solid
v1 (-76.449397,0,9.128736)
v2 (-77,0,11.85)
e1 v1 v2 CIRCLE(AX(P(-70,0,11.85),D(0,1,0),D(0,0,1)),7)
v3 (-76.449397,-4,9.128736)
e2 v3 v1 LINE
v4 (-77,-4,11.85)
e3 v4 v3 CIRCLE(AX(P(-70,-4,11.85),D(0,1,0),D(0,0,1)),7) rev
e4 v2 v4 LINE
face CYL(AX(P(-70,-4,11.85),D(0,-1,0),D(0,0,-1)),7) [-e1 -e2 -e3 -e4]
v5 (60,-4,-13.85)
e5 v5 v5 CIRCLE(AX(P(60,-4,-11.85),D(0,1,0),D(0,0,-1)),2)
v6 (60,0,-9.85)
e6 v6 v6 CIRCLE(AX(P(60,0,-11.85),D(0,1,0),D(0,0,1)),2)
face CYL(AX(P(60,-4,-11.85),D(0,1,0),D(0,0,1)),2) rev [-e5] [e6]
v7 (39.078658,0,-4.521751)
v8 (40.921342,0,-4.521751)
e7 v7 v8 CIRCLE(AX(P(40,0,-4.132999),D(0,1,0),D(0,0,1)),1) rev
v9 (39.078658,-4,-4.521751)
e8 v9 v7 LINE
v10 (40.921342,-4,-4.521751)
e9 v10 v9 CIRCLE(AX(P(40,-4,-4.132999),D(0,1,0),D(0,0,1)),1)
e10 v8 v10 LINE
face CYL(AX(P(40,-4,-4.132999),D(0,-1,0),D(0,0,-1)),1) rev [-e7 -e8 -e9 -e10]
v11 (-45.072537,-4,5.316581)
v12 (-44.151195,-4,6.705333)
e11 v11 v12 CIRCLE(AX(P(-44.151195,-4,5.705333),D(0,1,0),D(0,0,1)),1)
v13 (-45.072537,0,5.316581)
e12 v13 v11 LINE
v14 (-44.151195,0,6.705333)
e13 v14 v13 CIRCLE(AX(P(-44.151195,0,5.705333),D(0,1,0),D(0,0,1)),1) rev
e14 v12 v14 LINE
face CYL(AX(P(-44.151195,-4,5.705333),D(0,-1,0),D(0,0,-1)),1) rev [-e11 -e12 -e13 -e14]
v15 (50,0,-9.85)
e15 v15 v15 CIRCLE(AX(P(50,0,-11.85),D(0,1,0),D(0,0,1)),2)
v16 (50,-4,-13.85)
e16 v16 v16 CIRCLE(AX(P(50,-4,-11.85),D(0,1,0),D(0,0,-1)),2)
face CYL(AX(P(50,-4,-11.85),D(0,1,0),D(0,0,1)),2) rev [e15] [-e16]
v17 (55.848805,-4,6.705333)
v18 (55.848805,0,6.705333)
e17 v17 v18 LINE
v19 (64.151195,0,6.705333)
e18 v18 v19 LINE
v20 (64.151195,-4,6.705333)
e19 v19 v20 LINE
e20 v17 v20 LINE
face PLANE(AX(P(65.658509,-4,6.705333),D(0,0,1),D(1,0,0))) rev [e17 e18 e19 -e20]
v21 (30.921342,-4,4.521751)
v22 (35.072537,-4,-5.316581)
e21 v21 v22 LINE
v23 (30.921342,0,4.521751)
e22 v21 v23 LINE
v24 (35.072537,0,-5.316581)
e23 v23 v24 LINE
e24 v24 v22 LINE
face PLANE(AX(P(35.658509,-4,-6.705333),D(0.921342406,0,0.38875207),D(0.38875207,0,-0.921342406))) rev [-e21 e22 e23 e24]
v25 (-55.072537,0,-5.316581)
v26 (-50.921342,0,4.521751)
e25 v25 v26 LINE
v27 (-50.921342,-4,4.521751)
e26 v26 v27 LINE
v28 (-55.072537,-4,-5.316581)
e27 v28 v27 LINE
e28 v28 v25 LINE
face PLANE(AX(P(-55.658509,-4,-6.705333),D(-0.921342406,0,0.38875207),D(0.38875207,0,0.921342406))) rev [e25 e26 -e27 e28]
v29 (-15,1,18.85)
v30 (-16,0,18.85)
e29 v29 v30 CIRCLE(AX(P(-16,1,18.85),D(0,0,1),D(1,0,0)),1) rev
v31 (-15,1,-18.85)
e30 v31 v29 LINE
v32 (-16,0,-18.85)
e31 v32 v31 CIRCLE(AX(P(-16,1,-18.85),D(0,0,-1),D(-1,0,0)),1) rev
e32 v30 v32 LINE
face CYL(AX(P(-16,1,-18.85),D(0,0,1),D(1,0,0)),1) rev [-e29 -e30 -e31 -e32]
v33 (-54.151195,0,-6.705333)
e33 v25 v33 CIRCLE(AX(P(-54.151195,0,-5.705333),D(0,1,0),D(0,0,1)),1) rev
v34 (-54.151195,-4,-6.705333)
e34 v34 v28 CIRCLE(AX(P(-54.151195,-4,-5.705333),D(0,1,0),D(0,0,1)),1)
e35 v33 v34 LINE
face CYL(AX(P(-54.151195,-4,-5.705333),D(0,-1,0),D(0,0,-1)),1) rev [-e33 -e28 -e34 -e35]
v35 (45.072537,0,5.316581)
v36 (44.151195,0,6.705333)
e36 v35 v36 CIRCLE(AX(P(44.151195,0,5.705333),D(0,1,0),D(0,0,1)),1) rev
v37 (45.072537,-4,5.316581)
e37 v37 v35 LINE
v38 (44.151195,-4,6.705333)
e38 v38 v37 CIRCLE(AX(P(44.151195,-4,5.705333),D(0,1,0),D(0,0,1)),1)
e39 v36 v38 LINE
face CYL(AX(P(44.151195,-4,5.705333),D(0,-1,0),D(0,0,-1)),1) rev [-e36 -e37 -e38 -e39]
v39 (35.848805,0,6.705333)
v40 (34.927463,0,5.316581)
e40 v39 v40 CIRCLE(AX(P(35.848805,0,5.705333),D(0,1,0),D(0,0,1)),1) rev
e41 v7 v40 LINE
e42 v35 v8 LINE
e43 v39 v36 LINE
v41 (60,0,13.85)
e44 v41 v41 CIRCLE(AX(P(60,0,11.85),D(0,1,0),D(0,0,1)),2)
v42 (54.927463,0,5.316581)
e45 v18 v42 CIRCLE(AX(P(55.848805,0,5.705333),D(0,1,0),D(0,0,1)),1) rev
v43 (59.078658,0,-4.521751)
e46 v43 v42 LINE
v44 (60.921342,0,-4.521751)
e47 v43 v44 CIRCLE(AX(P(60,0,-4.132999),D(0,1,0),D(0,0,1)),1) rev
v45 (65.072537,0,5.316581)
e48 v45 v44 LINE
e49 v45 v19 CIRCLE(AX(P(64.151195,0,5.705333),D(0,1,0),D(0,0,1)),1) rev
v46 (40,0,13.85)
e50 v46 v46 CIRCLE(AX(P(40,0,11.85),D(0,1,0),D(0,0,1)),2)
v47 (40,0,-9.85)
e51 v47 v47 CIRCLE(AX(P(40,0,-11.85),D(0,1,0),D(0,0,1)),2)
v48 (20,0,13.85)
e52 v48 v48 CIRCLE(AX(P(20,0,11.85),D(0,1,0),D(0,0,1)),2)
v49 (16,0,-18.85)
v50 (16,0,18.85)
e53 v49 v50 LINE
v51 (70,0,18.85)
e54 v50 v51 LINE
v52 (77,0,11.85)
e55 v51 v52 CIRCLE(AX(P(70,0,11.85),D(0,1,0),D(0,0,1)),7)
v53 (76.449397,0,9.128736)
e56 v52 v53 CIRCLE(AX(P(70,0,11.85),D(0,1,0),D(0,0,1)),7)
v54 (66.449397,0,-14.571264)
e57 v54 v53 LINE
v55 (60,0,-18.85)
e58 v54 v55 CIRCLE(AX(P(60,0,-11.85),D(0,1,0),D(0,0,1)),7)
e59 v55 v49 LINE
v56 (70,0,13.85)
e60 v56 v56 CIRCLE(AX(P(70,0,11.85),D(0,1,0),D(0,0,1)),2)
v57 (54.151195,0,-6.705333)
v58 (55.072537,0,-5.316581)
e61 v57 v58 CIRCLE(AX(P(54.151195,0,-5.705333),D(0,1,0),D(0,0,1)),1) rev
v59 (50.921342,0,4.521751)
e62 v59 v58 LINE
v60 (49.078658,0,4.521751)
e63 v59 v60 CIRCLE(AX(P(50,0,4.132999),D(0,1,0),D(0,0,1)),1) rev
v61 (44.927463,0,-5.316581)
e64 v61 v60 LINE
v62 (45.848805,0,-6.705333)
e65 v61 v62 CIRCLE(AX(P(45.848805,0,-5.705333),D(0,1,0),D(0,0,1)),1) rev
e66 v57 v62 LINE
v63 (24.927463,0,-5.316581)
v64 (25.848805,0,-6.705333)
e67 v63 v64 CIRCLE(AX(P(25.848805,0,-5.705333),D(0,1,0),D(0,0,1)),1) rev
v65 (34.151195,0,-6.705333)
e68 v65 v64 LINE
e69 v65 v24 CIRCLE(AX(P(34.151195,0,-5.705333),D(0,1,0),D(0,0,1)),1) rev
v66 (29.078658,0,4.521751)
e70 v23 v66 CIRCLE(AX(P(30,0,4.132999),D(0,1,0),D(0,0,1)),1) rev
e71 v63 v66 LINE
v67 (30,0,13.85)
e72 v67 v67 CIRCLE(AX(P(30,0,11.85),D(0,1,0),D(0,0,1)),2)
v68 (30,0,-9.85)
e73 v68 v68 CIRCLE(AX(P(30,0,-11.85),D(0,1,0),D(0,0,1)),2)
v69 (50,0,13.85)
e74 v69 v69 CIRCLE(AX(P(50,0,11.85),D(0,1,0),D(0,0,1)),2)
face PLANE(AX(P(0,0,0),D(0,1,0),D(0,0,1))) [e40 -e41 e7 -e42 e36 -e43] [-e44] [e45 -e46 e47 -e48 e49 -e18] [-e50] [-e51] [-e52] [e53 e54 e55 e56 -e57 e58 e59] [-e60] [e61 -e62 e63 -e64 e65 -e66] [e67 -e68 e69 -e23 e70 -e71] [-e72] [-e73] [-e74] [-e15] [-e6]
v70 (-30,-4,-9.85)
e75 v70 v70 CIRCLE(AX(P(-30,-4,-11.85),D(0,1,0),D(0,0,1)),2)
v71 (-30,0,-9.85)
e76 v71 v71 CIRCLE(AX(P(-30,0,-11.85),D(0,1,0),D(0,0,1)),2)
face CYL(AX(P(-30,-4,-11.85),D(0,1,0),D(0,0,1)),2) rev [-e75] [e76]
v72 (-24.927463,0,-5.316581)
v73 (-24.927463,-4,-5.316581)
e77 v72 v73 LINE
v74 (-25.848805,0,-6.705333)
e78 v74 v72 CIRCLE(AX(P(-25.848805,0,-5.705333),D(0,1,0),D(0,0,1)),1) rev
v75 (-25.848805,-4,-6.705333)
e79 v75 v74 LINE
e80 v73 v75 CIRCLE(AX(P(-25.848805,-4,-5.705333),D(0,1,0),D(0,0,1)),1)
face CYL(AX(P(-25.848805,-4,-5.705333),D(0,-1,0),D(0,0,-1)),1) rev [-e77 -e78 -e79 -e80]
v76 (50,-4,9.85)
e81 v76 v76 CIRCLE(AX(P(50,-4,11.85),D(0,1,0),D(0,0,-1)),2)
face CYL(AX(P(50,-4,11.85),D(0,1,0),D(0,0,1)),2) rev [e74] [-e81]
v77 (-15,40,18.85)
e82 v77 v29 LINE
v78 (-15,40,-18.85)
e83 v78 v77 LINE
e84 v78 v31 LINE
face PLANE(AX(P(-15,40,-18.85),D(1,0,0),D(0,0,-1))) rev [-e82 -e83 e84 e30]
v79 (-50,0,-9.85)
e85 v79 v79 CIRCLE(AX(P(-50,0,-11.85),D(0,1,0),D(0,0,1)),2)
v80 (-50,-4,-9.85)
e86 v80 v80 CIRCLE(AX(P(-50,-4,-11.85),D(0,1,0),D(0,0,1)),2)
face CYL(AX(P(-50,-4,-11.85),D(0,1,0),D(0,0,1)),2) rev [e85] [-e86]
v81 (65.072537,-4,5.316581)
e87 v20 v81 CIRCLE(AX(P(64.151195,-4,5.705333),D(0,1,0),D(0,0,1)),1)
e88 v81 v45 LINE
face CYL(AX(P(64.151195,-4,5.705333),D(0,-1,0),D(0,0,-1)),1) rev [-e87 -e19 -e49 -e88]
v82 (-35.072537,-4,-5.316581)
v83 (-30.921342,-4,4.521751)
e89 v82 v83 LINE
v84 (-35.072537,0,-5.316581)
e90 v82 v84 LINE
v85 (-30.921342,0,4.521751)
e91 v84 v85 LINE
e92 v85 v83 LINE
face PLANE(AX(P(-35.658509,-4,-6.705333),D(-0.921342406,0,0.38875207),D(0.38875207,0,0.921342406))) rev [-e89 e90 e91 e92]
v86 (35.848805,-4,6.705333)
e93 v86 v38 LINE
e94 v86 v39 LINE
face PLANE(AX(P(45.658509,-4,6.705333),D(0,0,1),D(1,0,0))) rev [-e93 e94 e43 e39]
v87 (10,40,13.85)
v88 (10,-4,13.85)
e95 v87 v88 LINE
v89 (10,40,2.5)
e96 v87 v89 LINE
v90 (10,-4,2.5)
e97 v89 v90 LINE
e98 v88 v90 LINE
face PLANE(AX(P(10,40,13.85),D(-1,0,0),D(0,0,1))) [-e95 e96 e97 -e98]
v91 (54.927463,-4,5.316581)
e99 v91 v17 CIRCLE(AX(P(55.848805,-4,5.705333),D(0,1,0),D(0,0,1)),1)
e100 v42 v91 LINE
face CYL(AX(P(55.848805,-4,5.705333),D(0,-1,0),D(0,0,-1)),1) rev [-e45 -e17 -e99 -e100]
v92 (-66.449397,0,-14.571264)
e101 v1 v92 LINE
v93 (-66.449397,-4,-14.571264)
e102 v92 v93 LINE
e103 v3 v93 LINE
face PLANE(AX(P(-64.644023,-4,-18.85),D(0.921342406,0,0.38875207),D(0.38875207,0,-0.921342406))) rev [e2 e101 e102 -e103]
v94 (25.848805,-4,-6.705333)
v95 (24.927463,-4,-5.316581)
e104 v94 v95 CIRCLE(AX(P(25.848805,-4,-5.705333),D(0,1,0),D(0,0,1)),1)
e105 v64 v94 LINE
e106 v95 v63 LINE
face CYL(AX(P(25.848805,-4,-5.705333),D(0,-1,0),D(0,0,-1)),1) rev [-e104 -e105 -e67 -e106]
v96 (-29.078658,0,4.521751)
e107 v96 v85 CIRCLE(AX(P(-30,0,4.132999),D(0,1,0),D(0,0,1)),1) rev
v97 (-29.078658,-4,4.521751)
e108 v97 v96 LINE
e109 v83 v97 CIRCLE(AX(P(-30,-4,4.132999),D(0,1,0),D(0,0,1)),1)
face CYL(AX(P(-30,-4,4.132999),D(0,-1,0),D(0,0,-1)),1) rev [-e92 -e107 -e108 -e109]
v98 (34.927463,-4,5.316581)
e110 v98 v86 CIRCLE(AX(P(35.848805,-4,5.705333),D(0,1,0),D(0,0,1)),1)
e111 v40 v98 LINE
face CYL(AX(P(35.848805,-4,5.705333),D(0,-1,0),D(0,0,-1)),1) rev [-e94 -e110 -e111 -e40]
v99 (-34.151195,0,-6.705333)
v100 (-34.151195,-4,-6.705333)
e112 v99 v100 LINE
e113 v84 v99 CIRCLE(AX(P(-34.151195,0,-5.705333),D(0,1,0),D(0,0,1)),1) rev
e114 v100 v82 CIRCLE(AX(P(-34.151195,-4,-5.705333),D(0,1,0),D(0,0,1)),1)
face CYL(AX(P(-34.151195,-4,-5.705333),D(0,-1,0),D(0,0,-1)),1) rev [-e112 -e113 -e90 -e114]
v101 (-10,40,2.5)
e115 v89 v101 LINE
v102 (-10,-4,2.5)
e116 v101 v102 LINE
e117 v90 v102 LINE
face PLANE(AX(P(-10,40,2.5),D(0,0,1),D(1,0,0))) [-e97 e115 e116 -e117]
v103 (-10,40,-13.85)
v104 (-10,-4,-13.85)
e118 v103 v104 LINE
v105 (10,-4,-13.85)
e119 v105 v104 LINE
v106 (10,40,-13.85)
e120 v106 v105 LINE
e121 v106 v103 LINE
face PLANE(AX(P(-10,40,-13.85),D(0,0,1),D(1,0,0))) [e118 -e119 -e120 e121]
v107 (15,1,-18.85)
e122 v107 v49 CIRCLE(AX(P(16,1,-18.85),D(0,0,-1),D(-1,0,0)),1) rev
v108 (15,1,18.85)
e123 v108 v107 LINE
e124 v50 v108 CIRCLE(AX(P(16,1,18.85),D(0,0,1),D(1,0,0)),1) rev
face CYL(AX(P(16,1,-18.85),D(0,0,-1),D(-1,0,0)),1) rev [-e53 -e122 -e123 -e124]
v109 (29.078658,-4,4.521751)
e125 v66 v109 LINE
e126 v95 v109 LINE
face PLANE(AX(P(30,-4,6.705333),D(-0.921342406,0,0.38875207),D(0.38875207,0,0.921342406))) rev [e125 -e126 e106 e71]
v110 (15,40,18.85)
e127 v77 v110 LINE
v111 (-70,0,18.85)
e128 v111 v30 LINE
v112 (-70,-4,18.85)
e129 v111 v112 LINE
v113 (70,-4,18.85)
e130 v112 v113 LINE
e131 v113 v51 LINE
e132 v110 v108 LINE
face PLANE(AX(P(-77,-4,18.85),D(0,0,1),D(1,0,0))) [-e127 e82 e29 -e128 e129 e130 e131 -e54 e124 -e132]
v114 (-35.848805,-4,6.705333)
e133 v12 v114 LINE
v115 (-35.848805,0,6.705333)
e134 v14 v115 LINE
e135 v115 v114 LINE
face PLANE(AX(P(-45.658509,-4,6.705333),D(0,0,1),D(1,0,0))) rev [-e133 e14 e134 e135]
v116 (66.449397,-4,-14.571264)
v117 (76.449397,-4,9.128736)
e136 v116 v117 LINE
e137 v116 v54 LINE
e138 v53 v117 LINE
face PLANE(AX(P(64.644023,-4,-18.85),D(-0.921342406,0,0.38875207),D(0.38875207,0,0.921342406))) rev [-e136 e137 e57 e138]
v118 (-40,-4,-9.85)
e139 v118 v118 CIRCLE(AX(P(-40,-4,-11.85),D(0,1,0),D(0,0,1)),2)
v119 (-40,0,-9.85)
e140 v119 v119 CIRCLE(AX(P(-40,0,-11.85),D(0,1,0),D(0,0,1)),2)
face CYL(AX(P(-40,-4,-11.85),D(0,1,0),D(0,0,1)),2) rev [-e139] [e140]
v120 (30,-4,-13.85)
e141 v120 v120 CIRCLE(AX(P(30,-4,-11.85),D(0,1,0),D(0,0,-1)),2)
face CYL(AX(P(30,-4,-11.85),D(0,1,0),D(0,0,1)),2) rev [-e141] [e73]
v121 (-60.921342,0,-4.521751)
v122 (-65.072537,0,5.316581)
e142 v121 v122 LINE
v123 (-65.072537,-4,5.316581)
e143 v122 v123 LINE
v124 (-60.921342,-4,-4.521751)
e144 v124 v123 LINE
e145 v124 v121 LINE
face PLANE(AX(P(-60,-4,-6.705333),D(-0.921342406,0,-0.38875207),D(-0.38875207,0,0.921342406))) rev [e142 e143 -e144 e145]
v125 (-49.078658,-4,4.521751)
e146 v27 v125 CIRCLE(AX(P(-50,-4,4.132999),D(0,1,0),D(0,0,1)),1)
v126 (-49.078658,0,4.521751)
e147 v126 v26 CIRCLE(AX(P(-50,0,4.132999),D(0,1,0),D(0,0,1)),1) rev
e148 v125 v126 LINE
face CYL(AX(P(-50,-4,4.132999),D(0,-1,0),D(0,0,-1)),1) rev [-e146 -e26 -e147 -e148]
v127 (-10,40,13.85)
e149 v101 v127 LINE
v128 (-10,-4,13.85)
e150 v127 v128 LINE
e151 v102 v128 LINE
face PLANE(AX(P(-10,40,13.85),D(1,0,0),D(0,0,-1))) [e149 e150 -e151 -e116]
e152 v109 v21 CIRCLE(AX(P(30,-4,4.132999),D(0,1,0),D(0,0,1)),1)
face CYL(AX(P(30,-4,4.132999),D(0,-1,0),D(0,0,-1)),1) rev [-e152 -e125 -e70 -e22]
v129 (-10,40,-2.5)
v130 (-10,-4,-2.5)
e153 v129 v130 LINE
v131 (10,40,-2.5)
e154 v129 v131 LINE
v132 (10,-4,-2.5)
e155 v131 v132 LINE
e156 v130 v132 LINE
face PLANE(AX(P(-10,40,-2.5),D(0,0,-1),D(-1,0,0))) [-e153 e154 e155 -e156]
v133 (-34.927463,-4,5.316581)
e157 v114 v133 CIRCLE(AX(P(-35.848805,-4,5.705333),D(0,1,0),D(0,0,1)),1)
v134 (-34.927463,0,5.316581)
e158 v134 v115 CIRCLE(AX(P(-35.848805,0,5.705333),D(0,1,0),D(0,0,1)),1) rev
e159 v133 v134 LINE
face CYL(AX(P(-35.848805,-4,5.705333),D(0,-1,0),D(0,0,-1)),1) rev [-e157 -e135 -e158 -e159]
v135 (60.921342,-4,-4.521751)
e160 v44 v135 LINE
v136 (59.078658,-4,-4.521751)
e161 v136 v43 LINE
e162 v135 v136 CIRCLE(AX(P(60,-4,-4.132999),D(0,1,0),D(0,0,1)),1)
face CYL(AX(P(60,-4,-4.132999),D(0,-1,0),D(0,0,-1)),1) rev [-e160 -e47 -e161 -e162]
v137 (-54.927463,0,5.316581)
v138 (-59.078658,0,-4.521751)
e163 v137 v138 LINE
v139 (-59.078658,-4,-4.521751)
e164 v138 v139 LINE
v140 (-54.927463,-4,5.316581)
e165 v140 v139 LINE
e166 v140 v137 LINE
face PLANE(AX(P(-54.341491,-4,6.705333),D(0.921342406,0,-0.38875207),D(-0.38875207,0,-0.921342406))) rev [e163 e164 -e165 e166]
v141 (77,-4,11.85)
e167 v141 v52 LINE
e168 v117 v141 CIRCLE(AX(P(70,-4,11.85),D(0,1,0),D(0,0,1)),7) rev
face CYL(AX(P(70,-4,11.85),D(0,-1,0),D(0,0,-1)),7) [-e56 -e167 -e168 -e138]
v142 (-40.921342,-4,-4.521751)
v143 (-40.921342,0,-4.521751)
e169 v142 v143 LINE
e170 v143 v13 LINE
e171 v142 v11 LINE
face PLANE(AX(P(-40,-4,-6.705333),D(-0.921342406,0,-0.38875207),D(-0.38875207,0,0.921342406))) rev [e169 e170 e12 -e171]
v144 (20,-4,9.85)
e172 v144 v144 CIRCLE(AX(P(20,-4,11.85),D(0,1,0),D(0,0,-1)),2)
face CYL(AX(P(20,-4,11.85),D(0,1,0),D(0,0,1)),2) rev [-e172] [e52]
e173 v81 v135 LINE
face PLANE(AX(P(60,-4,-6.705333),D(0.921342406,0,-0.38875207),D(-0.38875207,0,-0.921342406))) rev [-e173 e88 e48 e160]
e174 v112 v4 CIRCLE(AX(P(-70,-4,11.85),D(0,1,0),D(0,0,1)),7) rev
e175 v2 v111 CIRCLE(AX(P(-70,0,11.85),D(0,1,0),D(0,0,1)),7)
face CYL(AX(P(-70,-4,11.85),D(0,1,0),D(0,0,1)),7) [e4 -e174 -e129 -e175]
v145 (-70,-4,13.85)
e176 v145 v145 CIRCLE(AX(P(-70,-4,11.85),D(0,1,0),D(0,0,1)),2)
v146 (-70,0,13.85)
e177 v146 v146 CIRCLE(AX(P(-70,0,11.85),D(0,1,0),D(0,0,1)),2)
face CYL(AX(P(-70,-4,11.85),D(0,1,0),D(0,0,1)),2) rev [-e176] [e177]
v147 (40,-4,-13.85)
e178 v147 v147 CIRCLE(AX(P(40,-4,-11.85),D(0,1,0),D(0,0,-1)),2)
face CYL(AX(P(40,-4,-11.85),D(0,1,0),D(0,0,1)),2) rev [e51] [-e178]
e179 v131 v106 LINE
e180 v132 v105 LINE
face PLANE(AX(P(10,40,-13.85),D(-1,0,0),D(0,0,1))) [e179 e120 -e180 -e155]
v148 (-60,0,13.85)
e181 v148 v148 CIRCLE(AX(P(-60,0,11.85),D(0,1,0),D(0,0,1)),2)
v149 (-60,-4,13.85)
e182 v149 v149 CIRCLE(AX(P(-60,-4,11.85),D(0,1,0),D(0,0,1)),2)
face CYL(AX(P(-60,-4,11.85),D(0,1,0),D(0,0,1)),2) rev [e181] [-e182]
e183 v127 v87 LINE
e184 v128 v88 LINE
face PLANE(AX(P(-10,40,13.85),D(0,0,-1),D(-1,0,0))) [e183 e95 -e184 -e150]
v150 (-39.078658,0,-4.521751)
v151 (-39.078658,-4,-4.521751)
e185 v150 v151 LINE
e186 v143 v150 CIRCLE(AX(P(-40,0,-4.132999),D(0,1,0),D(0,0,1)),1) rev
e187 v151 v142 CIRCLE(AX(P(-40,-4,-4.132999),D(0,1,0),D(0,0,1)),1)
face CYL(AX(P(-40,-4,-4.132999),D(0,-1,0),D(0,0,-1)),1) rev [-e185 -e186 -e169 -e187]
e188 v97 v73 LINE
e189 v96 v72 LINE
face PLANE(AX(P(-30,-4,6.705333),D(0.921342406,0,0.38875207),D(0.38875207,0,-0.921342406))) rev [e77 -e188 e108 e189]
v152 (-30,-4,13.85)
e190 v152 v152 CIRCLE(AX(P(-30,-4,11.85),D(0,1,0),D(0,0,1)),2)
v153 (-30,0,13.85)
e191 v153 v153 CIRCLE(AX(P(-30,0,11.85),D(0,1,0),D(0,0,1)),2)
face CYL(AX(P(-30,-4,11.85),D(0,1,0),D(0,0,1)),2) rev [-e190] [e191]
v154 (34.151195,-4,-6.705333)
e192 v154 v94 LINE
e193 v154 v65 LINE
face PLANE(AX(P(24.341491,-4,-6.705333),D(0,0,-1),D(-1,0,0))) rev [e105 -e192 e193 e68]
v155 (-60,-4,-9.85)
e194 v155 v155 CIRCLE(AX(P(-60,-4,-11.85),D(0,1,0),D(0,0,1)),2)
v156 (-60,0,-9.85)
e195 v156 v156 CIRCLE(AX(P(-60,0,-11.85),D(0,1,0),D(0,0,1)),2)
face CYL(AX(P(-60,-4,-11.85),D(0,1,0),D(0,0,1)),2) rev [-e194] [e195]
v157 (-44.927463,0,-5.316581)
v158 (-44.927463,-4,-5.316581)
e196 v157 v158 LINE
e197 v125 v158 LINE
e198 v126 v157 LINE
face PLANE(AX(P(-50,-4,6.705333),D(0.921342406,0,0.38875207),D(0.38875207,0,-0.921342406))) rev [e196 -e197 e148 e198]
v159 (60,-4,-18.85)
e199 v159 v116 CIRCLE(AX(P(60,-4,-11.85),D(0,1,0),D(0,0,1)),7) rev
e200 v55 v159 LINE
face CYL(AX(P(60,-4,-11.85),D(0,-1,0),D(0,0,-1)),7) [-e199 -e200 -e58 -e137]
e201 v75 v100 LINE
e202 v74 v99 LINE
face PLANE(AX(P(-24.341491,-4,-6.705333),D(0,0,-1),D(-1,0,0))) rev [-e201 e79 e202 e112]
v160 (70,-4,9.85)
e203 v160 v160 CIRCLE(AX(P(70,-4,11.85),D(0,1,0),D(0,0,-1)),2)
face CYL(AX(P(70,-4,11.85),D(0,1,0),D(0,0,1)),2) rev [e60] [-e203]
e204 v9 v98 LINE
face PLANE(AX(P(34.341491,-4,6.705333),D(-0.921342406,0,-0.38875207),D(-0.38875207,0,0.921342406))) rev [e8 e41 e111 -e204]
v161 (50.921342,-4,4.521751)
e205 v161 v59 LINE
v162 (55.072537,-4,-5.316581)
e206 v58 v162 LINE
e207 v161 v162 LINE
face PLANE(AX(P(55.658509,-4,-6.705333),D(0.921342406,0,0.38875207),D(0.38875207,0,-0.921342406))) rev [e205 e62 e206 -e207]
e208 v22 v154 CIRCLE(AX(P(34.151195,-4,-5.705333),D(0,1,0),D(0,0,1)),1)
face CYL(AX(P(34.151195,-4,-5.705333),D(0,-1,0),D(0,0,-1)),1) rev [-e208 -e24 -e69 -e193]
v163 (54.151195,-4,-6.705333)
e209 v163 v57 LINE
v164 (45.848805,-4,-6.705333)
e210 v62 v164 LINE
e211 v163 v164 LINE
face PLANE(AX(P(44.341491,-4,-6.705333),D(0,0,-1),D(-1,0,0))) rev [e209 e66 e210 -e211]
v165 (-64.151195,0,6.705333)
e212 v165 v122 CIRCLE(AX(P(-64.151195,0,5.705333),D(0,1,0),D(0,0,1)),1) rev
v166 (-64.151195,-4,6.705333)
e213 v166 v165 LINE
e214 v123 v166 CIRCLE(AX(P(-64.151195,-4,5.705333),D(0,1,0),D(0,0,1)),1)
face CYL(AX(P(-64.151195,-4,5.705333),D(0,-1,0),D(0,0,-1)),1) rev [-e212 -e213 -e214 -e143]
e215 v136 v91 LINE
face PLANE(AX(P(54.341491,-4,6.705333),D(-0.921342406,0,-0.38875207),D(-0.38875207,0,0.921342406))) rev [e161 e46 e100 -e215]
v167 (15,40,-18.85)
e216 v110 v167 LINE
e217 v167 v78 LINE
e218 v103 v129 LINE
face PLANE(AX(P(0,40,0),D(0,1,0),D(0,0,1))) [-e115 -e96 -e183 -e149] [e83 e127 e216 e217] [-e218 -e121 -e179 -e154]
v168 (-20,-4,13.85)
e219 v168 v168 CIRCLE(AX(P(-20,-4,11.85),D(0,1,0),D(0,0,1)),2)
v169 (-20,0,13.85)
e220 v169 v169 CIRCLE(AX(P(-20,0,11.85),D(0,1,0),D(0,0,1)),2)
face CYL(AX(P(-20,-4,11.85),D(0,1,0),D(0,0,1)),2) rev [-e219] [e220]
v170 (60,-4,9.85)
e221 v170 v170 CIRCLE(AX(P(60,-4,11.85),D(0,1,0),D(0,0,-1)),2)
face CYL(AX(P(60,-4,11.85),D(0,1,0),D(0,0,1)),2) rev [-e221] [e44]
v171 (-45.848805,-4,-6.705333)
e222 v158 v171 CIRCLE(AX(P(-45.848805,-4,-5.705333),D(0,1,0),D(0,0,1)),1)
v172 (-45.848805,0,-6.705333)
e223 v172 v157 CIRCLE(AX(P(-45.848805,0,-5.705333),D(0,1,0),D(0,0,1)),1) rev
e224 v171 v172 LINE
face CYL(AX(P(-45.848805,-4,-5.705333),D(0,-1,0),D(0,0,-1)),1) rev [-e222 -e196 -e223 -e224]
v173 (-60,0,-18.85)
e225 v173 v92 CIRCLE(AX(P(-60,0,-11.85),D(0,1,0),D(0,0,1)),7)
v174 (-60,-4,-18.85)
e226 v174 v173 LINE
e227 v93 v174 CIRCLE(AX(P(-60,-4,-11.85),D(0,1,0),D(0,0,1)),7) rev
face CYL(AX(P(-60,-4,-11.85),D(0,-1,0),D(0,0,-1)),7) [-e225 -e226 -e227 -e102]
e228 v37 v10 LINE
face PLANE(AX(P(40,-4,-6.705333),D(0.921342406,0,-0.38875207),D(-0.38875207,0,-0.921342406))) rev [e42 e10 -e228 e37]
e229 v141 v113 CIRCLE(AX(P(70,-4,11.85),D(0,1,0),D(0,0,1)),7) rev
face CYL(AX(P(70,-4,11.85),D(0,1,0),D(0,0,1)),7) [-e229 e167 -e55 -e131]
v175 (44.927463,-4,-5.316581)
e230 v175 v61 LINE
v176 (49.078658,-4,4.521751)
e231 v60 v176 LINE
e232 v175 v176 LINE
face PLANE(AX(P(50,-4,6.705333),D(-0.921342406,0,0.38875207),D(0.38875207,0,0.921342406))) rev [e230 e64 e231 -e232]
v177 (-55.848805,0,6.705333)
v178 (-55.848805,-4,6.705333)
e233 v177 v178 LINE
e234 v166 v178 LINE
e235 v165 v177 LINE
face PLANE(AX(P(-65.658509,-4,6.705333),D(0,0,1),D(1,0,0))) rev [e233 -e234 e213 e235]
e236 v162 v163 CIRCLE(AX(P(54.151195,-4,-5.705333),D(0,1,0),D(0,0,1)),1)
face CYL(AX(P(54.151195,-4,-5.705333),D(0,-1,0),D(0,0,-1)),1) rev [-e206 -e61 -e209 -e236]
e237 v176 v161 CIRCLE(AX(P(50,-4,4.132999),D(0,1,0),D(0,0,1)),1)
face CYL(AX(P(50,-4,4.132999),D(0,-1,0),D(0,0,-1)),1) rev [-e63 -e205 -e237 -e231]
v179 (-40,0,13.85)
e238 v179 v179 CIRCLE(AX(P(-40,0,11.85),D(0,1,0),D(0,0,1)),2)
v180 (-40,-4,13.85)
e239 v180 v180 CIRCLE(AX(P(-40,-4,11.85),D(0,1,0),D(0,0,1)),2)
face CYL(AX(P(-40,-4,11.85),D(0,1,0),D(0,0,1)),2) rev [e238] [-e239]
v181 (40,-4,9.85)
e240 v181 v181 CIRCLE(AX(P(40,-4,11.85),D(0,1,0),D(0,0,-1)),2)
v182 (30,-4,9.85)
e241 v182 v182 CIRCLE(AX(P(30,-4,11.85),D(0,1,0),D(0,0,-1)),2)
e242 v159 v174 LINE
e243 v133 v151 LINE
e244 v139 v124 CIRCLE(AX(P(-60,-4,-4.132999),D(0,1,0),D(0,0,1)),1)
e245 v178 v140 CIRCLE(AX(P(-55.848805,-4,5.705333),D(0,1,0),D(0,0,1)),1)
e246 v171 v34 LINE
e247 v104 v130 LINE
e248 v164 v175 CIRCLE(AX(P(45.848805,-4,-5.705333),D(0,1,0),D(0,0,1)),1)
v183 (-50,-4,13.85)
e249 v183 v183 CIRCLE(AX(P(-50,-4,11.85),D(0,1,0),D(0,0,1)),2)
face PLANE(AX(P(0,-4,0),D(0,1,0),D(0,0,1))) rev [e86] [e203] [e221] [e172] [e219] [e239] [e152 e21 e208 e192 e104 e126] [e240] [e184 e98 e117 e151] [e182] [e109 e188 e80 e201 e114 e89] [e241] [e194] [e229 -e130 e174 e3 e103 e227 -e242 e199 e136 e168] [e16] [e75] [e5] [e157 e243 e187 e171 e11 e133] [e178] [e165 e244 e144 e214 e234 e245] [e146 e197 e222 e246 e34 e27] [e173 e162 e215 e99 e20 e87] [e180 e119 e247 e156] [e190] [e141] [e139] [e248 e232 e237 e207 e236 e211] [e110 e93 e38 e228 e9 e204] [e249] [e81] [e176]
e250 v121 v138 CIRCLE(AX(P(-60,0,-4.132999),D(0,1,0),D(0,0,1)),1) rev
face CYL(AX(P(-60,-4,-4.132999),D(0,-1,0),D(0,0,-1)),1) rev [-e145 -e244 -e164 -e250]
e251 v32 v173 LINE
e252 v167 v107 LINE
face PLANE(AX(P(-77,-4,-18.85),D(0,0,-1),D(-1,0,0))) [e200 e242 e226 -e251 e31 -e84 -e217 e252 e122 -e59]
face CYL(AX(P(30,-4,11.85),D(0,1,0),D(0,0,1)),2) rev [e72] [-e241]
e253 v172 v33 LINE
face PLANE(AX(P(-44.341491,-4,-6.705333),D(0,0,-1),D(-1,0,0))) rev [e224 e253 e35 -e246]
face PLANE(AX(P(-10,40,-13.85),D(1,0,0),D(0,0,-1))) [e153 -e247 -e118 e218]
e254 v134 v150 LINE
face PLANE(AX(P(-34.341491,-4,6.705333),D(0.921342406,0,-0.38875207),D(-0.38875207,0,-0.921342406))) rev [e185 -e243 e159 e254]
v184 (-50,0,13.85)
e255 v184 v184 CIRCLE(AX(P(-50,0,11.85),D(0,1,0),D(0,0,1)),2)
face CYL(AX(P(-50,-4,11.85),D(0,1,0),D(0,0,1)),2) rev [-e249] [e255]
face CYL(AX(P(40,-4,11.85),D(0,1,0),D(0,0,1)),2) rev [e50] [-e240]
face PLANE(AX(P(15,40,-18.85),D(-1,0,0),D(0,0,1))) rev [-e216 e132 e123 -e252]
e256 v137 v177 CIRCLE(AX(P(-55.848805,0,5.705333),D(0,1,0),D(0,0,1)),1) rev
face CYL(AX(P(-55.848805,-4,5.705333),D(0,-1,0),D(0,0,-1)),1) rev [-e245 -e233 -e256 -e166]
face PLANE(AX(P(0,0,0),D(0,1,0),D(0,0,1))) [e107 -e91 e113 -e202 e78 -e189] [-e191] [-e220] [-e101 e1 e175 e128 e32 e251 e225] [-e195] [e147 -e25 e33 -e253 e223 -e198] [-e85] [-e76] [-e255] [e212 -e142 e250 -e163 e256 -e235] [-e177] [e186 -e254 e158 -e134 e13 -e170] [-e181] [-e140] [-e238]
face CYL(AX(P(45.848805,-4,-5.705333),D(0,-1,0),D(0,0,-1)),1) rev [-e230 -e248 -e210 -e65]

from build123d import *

# Parameters (mm, degrees)
SKETCH_1_W               = 154
SKETCH_1_H               = 37.7
EXTRUDE_1_DEPTH          = 4
CUT_EXTRUDE_1_DEPTH      = 80.374570865
CUT_EXTRUDE_1_DEPTH_BACK = 80.374570865
SKETCH_2_R               = 2
CUT_EXTRUDE_2_DEPTH      = 80.374570865
CUT_EXTRUDE_2_DEPTH_BACK = 80.374570865
FILLET_1_R               = 7
SKETCH_4_W               = 30
SKETCH_4_H               = 37.7
EXTRUDE_2_DEPTH          = 40
CUT_EXTRUDE_3_DEPTH      = 89.793707547
CUT_EXTRUDE_3_DEPTH_BACK = 89.793707547
SKETCH_5_W               = 20
SKETCH_5_H               = 11.35
CUT_EXTRUDE_4_DEPTH      = 89.793707547
CUT_EXTRUDE_4_DEPTH_BACK = 89.793707547
FILLET_2_R               = 1
FILLET_4_R               = 1


with BuildPart() as part:
    # 草图1 → 凸台-拉伸1 (new body)
    with BuildSketch(Plane(origin=(0, 0, 0), x_dir=(1, 0, 0), z_dir=(0, 1, 0))):
        Rectangle(SKETCH_1_W, SKETCH_1_H)
    extrude(amount=-EXTRUDE_1_DEPTH)

    # 草图2 → 切除-拉伸1 (cut, two sides: drawn at the far end of the back side and taken through both)
    with BuildSketch(Plane(origin=(0, 0, 0), x_dir=(1, 0, 0), z_dir=(0, 1, 0)).offset(-CUT_EXTRUDE_1_DEPTH_BACK)):
        with Locations(Location((-30, 11.85, 0), (0, 0, 270))):
            Circle(SKETCH_2_R)
        with Locations(Location((-20, -11.85, 0), (0, 0, 270))):
            Circle(SKETCH_2_R)
        with Locations(Location((-40, 11.85, 0), (0, 0, 270))):
            Circle(SKETCH_2_R)
        with Locations(Location((-50, 11.85, 0), (0, 0, 270))):
            Circle(SKETCH_2_R)
        with Locations(Location((-60, 11.85, 0), (0, 0, 270))):
            Circle(SKETCH_2_R)
        with Locations(Location((-30, -11.85, 0), (0, 0, 270))):
            Circle(SKETCH_2_R)
        with Locations(Location((-40, -11.85, 0), (0, 0, 270))):
            Circle(SKETCH_2_R)
        with Locations(Location((-50, -11.85, 0), (0, 0, 270))):
            Circle(SKETCH_2_R)
        with Locations(Location((-60, -11.85, 0), (0, 0, 270))):
            Circle(SKETCH_2_R)
        with Locations(Location((-70, -11.85, 0), (0, 0, 270))):
            Circle(SKETCH_2_R)
        with Locations(Location((20, -11.85, 0), (0, 0, 270))):
            Circle(SKETCH_2_R)
        with Locations(Location((30, -11.85, 0), (0, 0, 270))):
            Circle(SKETCH_2_R)
        with Locations(Location((40, -11.85, 0), (0, 0, 270))):
            Circle(SKETCH_2_R)
        with Locations(Location((50, -11.85, 0), (0, 0, 270))):
            Circle(SKETCH_2_R)
        with Locations(Location((60, -11.85, 0), (0, 0, 270))):
            Circle(SKETCH_2_R)
        with Locations(Location((70, -11.85, 0), (0, 0, 270))):
            Circle(SKETCH_2_R)
        with Locations(Location((30, 11.85, 0), (0, 0, 270))):
            Circle(SKETCH_2_R)
        with Locations(Location((40, 11.85, 0), (0, 0, 270))):
            Circle(SKETCH_2_R)
        with Locations(Location((50, 11.85, 0), (0, 0, 270))):
            Circle(SKETCH_2_R)
        with Locations(Location((60, 11.85, 0), (0, 0, 270))):
            Circle(SKETCH_2_R)
    extrude(amount=CUT_EXTRUDE_1_DEPTH + CUT_EXTRUDE_1_DEPTH_BACK, mode=Mode.SUBTRACT)

    # 草图3 → 切除-拉伸2 (cut, two sides: drawn at the far end of the back side and taken through both)
    with BuildSketch(Plane(origin=(0, 0, 0), x_dir=(1, 0, 0), z_dir=(0, 1, 0)).offset(-CUT_EXTRUDE_2_DEPTH_BACK)):
        Polygon((-64.644023205, 18.85), (-77, -10.433665004), (-77, 18.85), align=None)
        Polygon((64.644023205, 18.85), (77, -10.433665004), (77, 18.85), align=None)
    extrude(amount=CUT_EXTRUDE_2_DEPTH + CUT_EXTRUDE_2_DEPTH_BACK, mode=Mode.SUBTRACT)

    # 圆角1
    fillet_1_edges = [part.edges().sort_by_distance(p)[0] for p in [
        (77, -2, 18.85),
        (77, -2, 10.433665004),
        (64.644023205, -2, -18.85),
        (-77, -2, 18.85),
        (-77, -2, 10.433665004),
        (-64.644023205, -2, -18.85),
    ]]
    fillet(fillet_1_edges, radius=FILLET_1_R - 0.0001)  # a hair under: the kernel refuses the full size

    # 草图4 → 凸台-拉伸2 (add)
    with BuildSketch(Plane(origin=(0, 0, 0), x_dir=(1, 0, 0), z_dir=(0, 1, 0))):
        Rectangle(SKETCH_4_W, SKETCH_4_H)
    extrude(amount=EXTRUDE_2_DEPTH)

    # 草图5 → 切除-拉伸3 (cut, two sides: drawn at the far end of the back side and taken through both)
    with BuildSketch(Plane(origin=(0, 0, 0), x_dir=(1, 0, 0), z_dir=(0, 1, 0)).offset(-CUT_EXTRUDE_3_DEPTH_BACK)):
        with Locations((0, 8.175)):
            Rectangle(SKETCH_5_W, SKETCH_5_H)
        with Locations((0, -8.175)):
            Rectangle(SKETCH_5_W, SKETCH_5_H)
    extrude(amount=CUT_EXTRUDE_3_DEPTH + CUT_EXTRUDE_3_DEPTH_BACK, mode=Mode.SUBTRACT)

    # 草图6 → 切除-拉伸4 (cut, two sides: drawn at the far end of the back side and taken through both)
    with BuildSketch(Plane(origin=(0, 0, 0), x_dir=(1, 0, 0), z_dir=(0, 1, 0)).offset(-CUT_EXTRUDE_4_DEPTH_BACK)):
        Polygon((-34.341491259, -6.705332858), (-40, 6.705332858), (-45.658508741, -6.705332858), align=None)
        Polygon((-55.658508741, 6.705332858), (-50, -6.705332858), (-44.341491259, 6.705332858), align=None)
        Polygon((-60, 6.705332858), (-65.658508741, -6.705332858), (-54.341491259, -6.705332858), align=None)
        Polygon((-35.658508741, 6.705332858), (-30, -6.705332858), (-24.341491259, 6.705332858), align=None)
        Polygon((24.341491259, 6.705332858), (35.658508741, 6.705332858), (30, -6.705332858), align=None)
        Polygon((45.658508741, -6.705332858), (34.341491259, -6.705332858), (40, 6.705332858), align=None)
        Polygon((44.341491259, 6.705332858), (55.658508741, 6.705332858), (50, -6.705332858), align=None)
        Polygon((65.658508741, -6.705332858), (54.341491259, -6.705332858), (60, 6.705332858), align=None)
    extrude(amount=CUT_EXTRUDE_4_DEPTH + CUT_EXTRUDE_4_DEPTH_BACK, mode=Mode.SUBTRACT)

    # 圆角2
    fillet_2_edges = [part.edges().sort_by_distance(p)[0] for p in [
        (50, -2, 6.705332858),
        (44.341491259, -2, -6.705332858),
        (55.658508741, -2, -6.705332858),
        (40, -2, -6.705332858),
        (45.658508741, -2, 6.705332858),
        (34.341491259, -2, 6.705332858),
        (60, -2, -6.705332858),
        (65.658508741, -2, 6.705332858),
        (54.341491259, -2, 6.705332858),
        (-45.658508741, -2, 6.705332858),
        (-40, -2, -6.705332858),
        (-34.341491259, -2, 6.705332858),
        (-60, -2, -6.705332858),
        (-54.341491259, -2, 6.705332858),
        (-65.658508741, -2, 6.705332858),
        (-24.341491259, -2, -6.705332858),
        (-30, -2, 6.705332858),
        (-35.658508741, -2, -6.705332858),
        (-44.341491259, -2, -6.705332858),
        (-50, -2, 6.705332858),
        (-55.658508741, -2, -6.705332858),
        (30, -2, 6.705332858),
        (24.341491259, -2, -6.705332858),
        (35.658508741, -2, -6.705332858),
    ]]
    fillet(fillet_2_edges, radius=FILLET_2_R)

    # 圆角4
    fillet_4_edges = [part.edges().sort_by_distance(p)[0] for p in [
        (-15, 0, 0),
        (15, 0, 0),
    ]]
    fillet(fillet_4_edges, radius=FILLET_4_R)


solid = part.part
